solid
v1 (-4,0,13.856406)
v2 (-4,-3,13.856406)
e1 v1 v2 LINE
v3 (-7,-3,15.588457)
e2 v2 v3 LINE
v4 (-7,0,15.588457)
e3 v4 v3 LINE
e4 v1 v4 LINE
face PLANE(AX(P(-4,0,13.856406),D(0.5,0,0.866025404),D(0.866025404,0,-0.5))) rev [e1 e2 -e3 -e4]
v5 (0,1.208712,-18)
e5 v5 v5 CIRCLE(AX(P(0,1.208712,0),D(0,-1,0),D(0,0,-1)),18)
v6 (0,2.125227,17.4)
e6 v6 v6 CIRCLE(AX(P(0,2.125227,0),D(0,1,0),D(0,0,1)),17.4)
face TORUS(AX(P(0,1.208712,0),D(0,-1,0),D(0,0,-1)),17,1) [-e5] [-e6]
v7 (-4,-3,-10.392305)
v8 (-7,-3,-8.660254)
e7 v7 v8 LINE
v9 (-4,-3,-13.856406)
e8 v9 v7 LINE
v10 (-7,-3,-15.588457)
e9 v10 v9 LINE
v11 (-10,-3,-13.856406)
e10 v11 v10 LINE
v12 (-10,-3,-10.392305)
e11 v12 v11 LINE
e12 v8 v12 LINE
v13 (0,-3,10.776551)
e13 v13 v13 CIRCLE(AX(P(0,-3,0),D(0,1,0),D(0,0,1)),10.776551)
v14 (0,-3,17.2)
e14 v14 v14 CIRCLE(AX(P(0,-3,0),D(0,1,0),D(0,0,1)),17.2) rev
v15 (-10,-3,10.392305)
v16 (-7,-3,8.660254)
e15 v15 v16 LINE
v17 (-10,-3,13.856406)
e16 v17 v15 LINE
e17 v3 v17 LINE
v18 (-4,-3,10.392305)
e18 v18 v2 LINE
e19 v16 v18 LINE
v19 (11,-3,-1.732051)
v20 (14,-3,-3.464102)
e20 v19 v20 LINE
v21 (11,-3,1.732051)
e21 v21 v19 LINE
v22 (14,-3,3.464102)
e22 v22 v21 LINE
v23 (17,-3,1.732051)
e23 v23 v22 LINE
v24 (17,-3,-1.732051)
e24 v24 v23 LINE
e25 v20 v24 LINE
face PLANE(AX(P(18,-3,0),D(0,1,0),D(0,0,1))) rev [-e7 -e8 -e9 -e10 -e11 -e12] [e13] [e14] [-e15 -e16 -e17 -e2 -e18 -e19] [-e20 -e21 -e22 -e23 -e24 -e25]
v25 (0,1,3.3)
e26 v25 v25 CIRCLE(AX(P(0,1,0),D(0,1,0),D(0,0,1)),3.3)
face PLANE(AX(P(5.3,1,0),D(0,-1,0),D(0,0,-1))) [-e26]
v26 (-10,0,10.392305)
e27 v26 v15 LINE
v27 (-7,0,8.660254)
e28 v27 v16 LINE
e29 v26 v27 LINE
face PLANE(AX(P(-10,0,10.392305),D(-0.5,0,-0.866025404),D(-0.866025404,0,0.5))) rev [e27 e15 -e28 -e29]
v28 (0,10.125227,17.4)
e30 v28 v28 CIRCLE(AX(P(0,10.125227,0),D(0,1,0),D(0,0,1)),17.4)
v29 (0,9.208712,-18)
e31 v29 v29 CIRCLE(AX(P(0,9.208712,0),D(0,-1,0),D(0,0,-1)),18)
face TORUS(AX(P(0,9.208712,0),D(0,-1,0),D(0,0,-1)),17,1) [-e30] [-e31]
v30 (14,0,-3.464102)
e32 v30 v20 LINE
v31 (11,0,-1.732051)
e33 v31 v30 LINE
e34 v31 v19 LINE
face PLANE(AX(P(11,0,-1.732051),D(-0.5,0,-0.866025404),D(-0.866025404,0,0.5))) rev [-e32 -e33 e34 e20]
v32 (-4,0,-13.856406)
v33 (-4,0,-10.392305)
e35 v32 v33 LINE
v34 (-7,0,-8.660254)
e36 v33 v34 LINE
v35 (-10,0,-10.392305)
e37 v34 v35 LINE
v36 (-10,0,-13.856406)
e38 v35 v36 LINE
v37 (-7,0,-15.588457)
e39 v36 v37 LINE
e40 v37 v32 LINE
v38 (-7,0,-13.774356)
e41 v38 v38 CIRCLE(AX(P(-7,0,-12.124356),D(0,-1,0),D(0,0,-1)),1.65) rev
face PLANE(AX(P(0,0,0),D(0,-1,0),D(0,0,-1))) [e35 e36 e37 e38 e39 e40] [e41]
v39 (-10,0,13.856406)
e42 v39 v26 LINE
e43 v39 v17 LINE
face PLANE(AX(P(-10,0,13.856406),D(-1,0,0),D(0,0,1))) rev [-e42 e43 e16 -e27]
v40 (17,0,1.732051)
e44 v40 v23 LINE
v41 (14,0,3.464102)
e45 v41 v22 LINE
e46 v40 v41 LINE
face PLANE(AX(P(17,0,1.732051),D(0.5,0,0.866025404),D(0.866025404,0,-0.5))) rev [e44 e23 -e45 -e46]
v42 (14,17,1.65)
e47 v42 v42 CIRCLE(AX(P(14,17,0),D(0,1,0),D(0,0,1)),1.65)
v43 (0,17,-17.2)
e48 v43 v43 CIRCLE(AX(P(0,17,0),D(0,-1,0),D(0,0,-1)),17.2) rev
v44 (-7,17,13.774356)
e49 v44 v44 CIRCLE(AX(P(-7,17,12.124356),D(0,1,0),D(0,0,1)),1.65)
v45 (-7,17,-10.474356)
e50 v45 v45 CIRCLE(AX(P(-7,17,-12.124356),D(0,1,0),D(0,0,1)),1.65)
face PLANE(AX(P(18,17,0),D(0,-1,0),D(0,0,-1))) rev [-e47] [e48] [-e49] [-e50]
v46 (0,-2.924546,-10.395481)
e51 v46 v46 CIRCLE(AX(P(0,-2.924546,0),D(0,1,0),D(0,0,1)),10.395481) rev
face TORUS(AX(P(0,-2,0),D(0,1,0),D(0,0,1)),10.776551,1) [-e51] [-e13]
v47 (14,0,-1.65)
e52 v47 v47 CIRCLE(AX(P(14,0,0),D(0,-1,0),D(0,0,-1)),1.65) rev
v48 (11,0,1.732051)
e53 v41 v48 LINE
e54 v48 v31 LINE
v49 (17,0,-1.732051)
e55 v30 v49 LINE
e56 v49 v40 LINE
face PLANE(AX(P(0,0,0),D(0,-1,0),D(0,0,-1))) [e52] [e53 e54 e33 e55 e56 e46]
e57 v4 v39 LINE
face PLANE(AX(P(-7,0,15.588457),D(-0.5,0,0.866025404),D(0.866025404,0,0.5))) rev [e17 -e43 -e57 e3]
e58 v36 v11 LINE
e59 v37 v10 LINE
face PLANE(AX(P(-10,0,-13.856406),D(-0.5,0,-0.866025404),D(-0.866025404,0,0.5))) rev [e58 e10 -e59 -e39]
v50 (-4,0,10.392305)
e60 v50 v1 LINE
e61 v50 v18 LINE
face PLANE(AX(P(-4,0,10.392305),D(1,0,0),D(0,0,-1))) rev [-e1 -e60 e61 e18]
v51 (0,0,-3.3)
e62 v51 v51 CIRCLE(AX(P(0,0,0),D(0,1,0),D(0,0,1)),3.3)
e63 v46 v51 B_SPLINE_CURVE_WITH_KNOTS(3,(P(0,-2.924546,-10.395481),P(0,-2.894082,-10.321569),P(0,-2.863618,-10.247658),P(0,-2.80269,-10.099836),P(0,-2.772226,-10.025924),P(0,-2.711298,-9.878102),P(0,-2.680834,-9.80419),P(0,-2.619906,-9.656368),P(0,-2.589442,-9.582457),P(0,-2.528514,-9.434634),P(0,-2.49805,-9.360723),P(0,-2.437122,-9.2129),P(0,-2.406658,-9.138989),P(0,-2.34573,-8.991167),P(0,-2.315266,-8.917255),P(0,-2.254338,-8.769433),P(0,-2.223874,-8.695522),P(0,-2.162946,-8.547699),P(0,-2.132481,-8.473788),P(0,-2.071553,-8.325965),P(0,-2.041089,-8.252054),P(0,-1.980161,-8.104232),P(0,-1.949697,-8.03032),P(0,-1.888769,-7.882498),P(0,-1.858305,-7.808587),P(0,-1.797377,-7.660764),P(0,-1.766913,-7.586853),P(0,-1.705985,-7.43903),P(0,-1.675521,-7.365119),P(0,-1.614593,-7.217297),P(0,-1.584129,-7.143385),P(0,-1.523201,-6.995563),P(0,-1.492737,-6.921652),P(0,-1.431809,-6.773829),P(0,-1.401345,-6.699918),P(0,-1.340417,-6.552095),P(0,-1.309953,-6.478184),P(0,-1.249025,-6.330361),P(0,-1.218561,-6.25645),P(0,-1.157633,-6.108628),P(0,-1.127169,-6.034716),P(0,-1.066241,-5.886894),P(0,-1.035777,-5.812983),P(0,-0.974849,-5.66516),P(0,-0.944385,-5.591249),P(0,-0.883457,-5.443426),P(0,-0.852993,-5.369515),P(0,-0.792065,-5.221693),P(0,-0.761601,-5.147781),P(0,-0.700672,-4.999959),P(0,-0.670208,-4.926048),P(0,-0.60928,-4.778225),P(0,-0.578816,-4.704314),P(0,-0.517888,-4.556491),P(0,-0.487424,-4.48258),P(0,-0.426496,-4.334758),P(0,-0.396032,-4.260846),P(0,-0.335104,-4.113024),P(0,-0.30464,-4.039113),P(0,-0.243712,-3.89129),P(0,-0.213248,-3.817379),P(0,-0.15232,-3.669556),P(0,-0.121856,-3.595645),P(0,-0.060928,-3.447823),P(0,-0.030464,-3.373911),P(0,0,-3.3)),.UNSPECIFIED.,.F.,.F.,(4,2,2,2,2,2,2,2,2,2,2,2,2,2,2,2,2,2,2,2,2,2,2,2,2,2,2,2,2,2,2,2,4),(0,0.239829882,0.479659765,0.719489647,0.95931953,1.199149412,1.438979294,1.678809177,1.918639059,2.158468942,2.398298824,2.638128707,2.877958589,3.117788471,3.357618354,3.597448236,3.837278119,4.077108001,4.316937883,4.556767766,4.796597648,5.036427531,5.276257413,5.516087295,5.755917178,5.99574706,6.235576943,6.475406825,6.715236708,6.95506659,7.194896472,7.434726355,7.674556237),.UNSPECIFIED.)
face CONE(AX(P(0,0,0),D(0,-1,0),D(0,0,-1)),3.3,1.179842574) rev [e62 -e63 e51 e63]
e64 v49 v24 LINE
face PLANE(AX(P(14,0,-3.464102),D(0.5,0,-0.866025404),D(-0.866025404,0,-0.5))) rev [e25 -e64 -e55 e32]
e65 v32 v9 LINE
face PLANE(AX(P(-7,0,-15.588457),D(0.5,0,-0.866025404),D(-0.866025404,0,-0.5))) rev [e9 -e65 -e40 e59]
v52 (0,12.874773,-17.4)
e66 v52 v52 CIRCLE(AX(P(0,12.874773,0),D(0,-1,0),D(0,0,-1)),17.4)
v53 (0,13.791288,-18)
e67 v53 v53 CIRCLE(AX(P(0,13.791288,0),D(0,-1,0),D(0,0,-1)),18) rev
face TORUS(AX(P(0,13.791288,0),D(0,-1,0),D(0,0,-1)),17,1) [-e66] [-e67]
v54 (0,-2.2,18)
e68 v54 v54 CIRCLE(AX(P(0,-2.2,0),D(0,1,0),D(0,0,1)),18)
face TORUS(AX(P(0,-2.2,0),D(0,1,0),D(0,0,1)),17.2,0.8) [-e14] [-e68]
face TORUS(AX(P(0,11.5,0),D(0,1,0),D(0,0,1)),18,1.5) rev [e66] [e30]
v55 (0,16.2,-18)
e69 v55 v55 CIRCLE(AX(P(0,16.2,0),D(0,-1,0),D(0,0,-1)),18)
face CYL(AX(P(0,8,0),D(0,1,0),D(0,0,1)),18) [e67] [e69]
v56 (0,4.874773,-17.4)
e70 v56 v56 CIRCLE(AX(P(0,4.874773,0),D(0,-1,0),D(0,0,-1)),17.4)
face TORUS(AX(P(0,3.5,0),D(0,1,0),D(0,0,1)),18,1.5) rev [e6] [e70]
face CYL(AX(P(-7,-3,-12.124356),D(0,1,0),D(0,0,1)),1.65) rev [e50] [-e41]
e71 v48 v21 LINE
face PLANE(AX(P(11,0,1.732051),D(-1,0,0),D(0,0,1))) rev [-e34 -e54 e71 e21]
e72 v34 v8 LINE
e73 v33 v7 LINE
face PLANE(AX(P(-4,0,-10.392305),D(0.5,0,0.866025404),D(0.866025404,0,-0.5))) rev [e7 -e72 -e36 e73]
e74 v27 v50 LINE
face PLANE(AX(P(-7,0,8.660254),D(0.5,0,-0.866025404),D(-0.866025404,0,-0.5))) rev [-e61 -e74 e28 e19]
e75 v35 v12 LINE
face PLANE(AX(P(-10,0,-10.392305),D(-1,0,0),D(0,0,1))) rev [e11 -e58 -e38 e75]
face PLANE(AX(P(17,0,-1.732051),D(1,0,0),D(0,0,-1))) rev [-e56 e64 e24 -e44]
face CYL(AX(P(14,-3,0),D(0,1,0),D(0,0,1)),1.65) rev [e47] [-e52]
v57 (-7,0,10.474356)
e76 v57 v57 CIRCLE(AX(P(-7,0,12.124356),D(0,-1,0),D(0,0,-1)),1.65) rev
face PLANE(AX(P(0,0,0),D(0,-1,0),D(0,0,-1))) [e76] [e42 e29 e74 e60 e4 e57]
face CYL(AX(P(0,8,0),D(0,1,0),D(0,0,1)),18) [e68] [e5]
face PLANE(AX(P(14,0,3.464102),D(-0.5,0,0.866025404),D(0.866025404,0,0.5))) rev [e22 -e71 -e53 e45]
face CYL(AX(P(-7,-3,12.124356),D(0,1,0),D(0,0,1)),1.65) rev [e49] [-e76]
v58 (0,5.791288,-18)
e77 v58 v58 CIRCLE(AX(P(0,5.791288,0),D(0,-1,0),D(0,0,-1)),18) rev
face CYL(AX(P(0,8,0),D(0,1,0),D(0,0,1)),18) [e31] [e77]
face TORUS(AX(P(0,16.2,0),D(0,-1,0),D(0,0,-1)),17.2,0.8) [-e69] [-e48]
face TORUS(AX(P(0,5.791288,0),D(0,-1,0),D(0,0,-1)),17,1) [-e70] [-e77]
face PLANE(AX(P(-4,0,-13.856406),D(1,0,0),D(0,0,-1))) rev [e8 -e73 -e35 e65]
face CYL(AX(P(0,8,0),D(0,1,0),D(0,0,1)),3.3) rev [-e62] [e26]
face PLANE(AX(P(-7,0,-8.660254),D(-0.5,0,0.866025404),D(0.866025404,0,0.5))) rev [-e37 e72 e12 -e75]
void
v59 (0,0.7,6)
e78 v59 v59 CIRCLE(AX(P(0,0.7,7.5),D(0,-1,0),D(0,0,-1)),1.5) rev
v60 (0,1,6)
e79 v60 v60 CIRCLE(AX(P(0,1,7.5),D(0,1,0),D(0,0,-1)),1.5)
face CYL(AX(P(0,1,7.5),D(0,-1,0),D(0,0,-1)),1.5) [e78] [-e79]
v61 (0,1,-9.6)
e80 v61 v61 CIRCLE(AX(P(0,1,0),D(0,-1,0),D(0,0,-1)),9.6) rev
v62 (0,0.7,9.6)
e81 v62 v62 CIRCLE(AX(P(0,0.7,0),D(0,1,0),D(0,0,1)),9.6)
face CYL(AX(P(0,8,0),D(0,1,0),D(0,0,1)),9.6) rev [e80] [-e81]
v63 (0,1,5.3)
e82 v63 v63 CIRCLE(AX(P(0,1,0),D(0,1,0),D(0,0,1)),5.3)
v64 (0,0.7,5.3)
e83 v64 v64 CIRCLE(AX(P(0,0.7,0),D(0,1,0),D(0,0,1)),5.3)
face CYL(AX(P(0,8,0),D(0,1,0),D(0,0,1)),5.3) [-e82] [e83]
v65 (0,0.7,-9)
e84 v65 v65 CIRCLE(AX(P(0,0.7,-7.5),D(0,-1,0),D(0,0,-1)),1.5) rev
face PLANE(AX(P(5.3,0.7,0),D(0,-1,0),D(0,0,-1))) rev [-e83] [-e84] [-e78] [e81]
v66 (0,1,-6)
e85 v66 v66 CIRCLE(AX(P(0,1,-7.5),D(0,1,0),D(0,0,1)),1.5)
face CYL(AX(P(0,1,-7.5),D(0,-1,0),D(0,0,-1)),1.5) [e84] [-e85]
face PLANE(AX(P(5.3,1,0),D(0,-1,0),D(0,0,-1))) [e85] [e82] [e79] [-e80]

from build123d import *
from OCP.BRepFilletAPI import BRepFilletAPI_MakeFillet

# Parameters (mm, degrees)
ESQUISSE2_R             = 1.65
ENL_V_MAT_EXTRU_1_DEPTH = 33.372828112
ENL_V_MAT_EXTRU_2_DEPTH = 3
CHANFREIN1_SIZE         = 0.6
CHANFREIN1_SIZE_2       = 17.18175197
CONG_1_R1               = 1
CONG_1_R2               = 0.8
ESQUISSE4_R             = 1.5
BOSS_EXTRU_1_DEPTH      = 0.3
CONG_3_R                = 1
ESQUISSE5_R             = 11.97255102
BOSS_EXTRU_2_DEPTH      = 16


with BuildPart() as part:
    # Esquisse1 → Révolution1 (revolve)
    with BuildSketch(Plane.XY, mode=Mode.PRIVATE) as r_volution1_sk:
        with BuildLine():
            Line((18, 17), (10.6, 17))
            Line((10.6, 17), (10.6, 1))
            Line((10.6, 1), (9.6, 1))
            Line((9.6, 1), (9.6, 0.7))
            Line((9.6, 0.7), (5.3, 0.7))
            Line((5.3, 0.7), (5.3, 1))
            Line((5.3, 1), (3.3, 1))
            Line((3.3, 1), (3.3, 0))
            Line((3.3, 0), (10.578545573, -3))
            Line((10.578545573, -3), (18, -3))
            Line((18, -3), (18, 2))
            ThreePointArc((18, 2), (16.5, 3.5), (18, 5))
            Line((18, 5), (18, 10))
            ThreePointArc((18, 10), (16.5, 11.5), (18, 13))
            Line((18, 13), (18, 17))
        make_face()
    revolve(r_volution1_sk.sketch.rotate(Axis((0, 8, 0), (0, -1, 0)), 90), axis=Axis((0, 8, 0), (0, -1, 0)))

    # Esquisse2 → Enlèv. mat.-Extru.1 (cut, through all)
    with BuildSketch(Plane(origin=(0, 17, 0), x_dir=(1, 0, 0), z_dir=(0, 1, 0))):
        with Locations(Location((14, 0, 0), (0, 0, 270))):
            Circle(ESQUISSE2_R)
        with Locations(Location((-7, -12.124355653, 0), (0, 0, 270))):
            Circle(ESQUISSE2_R)
        with Locations(Location((-7, 12.124355653, 0), (0, 0, 270))):
            Circle(ESQUISSE2_R)
    extrude(amount=-ENL_V_MAT_EXTRU_1_DEPTH, mode=Mode.SUBTRACT)

    # Esquisse3 → Enlèv. mat.-Extru.2 (cut)
    with BuildSketch(Plane.XZ.offset(3)):
        Polygon((14, -3.464101615), (17, -1.732050808), (17, 1.732050808), (14, 3.464101615), (11, 1.732050808), (11, -1.732050808), align=None)
        Polygon((-7, -8.660254038), (-10, -10.392304845), (-10, -13.856406461), (-7, -15.588457268), (-4, -13.856406461), (-4, -10.392304845), align=None)
        Polygon((-4, 10.392304845), (-4, 13.856406461), (-7, 15.588457268), (-10, 13.856406461), (-10, 10.392304845), (-7, 8.660254038), align=None)
    extrude(amount=-ENL_V_MAT_EXTRU_2_DEPTH, mode=Mode.SUBTRACT)

    # Chanfrein1
    # the kernel refuses this chamfer: 17.18175197, 0.6 mm, written as the material it takes off along each edge
    with BuildSketch(Plane(origin=(0, 17, 0), x_dir=(0, 0, 1), z_dir=(1, 0, 0))) as chanfrein1_piece_1_section:
        Polygon((10.6 + CHANFREIN1_SIZE, 0), (10.6, CHANFREIN1_SIZE_2), (10.6, 0), align=None)
    chanfrein1_piece_1 = revolve(axis=Axis((0, 17, 0), (0, -1, 0)), mode=Mode.PRIVATE)
    chanfrein1_piece_1 = split(chanfrein1_piece_1, bisect_by=Plane(origin=(0, 1, -10.842656471), z_dir=(0, 1, 0)), keep=Keep.TOP, mode=Mode.PRIVATE)
    add(chanfrein1_piece_1, mode=Mode.SUBTRACT)

    # Congé1: one fillet with a radius per group of edges: ONE call of the kernel's fillet builder (fillet() takes one radius for all edges)
    cong_1_edges_1 = [part.edges().sort_by_distance(p)[0] for p in [
        (0, -3, -10.578545573),
    ]]
    cong_1_edges_2 = [part.edges().sort_by_distance(p)[0] for p in [
        (0, 17, -11.2),
        (0, -3, -18),
        (0, 17, -18),
    ]]
    cong_1 = BRepFilletAPI_MakeFillet(part.part.solid().wrapped)
    for e in cong_1_edges_1:
        cong_1.Add(CONG_1_R1, e.wrapped)
    for e in cong_1_edges_2:
        cong_1.Add(CONG_1_R2, e.wrapped)
    add(Compound.cast(cong_1.Shape()), mode=Mode.REPLACE)

    # Esquisse4 → Boss.-Extru.1 (add)
    with BuildSketch(Plane(origin=(0, 0.7, 0), x_dir=(1, 0, 0), z_dir=(0, 1, 0))):
        with Locations(Location((0, 7.5, 0), (0, 0, 90))):
            Circle(ESQUISSE4_R)
        with Locations(Location((0, -7.5, 0), (0, 0, 90))):
            Circle(ESQUISSE4_R)
    extrude(amount=BOSS_EXTRU_1_DEPTH)

    # Congé3
    cong_3_edges = [part.edges().sort_by_distance(p)[0] for p in [
        (0, 2, -18),
        (0, 13, -18),
        (0, 10, -18),
        (0, 5, -18),
    ]]
    fillet(cong_3_edges, radius=CONG_3_R)

    # Esquisse5 → Boss.-Extru.2 (add)
    with BuildSketch(Plane(origin=(0, 17, 0), x_dir=(1, 0, 0), z_dir=(0, 1, 0))):
        Circle(ESQUISSE5_R)
    extrude(amount=-BOSS_EXTRU_2_DEPTH)


solid = part.part
